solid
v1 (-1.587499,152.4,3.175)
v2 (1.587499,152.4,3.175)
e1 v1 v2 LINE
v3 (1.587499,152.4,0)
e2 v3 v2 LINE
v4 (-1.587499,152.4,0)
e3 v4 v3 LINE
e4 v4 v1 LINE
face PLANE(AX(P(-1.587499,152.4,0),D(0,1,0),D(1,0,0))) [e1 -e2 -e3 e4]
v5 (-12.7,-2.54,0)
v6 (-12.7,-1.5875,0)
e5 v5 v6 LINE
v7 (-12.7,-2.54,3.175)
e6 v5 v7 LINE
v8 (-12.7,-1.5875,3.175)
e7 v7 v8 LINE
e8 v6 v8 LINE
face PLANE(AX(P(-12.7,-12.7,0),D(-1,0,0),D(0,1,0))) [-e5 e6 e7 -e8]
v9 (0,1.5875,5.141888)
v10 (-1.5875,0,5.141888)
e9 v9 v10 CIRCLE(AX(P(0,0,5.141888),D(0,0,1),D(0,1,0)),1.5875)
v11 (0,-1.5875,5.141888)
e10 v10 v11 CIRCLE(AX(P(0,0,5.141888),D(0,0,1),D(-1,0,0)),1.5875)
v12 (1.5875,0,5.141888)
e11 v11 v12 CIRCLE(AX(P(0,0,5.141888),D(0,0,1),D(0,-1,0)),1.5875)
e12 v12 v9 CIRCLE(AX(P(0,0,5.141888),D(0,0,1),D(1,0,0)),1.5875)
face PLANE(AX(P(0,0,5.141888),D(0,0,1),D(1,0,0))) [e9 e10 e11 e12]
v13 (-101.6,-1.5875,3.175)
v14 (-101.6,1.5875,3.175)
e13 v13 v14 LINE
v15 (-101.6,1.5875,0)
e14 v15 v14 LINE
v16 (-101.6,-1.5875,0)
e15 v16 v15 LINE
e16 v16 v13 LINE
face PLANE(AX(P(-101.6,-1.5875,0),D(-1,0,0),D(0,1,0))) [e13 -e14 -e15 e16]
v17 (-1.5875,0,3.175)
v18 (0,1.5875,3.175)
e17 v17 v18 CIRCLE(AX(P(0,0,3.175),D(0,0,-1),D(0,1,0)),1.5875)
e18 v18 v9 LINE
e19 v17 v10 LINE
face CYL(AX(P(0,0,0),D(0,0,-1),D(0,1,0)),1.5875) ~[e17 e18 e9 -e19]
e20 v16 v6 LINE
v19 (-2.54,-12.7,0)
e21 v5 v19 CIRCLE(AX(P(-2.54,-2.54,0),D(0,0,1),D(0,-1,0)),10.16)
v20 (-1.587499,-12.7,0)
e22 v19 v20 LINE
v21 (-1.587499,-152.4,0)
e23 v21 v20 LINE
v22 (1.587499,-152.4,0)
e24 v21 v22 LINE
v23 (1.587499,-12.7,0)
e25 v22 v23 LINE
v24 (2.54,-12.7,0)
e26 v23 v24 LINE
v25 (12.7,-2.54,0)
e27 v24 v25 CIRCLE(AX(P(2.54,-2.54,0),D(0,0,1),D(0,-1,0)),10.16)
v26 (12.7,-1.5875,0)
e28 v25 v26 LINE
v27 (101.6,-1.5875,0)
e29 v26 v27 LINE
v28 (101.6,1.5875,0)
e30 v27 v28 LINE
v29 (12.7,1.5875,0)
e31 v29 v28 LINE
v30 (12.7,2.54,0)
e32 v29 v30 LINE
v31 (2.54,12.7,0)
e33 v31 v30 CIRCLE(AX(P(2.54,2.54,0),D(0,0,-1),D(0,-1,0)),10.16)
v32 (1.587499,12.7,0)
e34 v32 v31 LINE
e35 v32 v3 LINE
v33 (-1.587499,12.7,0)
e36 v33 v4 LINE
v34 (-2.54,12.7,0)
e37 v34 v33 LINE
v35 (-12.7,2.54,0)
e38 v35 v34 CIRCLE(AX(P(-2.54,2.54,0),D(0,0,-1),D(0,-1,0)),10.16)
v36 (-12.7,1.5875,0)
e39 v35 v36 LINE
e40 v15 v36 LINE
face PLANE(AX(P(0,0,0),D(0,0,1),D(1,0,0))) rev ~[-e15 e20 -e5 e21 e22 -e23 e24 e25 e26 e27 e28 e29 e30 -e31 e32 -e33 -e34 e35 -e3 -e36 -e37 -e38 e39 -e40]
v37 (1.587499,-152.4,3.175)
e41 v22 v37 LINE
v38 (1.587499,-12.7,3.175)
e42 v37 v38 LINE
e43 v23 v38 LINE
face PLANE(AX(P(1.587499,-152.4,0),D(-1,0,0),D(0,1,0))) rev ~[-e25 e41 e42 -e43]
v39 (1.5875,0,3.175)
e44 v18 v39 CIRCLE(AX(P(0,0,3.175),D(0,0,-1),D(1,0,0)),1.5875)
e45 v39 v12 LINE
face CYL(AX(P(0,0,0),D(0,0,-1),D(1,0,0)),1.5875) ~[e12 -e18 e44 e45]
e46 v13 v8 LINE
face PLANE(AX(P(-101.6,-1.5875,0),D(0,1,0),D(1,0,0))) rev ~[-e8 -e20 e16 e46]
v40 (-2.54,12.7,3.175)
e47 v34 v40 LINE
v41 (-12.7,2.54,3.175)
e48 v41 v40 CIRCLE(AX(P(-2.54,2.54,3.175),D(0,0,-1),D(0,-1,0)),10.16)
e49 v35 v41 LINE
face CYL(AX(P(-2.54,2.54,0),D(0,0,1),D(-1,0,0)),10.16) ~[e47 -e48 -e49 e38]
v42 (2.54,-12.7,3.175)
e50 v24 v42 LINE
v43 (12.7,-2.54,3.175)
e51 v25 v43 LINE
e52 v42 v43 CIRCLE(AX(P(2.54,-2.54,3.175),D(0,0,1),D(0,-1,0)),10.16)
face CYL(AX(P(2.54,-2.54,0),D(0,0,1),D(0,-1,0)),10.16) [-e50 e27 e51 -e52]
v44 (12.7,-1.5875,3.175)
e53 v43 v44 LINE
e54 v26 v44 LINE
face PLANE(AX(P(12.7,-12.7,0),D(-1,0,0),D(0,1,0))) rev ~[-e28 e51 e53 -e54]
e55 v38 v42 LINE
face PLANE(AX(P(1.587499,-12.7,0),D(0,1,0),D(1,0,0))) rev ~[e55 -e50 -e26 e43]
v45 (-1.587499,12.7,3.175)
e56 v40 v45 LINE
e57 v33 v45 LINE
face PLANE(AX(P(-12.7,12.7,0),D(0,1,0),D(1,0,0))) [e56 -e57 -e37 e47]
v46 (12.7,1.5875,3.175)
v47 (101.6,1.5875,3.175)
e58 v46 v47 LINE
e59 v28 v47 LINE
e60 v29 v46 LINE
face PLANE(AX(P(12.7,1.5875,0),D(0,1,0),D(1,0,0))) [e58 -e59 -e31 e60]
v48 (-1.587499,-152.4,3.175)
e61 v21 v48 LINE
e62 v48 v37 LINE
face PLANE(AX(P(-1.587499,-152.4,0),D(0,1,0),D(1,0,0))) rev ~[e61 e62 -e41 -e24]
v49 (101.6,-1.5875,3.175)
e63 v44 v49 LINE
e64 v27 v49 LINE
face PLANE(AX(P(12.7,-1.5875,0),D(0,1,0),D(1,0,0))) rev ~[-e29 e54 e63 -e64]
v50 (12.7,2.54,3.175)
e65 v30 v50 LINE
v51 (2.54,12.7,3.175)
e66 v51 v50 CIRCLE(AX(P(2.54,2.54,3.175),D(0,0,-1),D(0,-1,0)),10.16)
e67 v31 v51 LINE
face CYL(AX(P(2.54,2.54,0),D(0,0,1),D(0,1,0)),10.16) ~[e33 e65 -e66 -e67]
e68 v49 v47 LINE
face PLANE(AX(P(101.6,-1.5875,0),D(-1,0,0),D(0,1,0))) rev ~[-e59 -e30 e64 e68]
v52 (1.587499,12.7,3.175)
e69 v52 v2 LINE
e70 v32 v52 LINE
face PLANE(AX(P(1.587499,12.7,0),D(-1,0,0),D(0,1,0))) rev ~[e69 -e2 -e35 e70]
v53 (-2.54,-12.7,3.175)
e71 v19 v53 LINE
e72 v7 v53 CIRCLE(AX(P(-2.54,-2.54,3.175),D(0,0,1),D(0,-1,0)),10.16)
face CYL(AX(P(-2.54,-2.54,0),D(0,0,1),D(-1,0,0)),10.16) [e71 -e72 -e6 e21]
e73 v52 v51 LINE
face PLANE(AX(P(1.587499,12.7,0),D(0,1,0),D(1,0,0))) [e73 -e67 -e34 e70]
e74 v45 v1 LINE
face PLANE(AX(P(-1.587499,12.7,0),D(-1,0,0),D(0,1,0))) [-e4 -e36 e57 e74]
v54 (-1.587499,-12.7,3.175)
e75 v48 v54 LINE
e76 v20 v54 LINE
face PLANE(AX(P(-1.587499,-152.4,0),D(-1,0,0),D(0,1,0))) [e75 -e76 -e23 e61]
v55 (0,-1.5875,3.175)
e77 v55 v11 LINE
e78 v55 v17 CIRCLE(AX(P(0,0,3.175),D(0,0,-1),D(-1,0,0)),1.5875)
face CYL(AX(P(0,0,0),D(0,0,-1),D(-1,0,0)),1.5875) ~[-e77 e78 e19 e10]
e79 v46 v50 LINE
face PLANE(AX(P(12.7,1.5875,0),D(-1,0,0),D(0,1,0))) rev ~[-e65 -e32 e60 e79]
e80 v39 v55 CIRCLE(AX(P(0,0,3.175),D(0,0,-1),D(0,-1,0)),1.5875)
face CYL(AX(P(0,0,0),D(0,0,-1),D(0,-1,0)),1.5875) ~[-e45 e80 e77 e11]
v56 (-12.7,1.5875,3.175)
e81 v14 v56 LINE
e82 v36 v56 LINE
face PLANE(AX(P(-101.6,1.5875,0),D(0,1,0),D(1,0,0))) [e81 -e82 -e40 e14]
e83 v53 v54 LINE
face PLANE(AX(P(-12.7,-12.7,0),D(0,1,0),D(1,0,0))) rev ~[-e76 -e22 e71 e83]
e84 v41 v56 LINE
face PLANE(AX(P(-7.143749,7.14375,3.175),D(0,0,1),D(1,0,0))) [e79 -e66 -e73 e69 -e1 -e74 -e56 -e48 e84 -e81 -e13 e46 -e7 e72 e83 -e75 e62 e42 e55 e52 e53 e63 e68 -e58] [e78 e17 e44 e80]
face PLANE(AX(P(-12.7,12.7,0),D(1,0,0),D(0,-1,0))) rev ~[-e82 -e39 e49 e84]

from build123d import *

# Parameters (mm, degrees)
F0_W     = 11.1125013079
F0_H     = 11.1125
F0_W_2   = 3.1749973842
F0_H_2   = 139.7
F0_W_3   = 88.9
F0_H_3   = 3.175
F1_DEPTH = 3.175
F2_DEPTH = 5.1418882795
F3_R     = 10.16


# Not quite as in the source:
# - ends of sketch curves that miss each other by under 0.0002 mm in the source are joined


with BuildPart() as f1:
    # F0 (on Top) → F1 (new body)
    with BuildSketch(Plane.XY):
        with Locations((-7.143749346, 7.14375)):
            Rectangle(F0_W, F0_H)
        with Locations((7.143749346, 7.14375)):
            Rectangle(F0_W, F0_H)
        with Locations((7.143749346, -7.14375)):
            Rectangle(F0_W, F0_H)
        with Locations((-7.143749346, -7.14375)):
            Rectangle(F0_W, F0_H)
        with Locations((0, 82.55)):
            Rectangle(F0_W_2, F0_H_2)
        Polygon((0, 1.5875), (1.5874986921, 1.5875), (1.5874986921, 12.7), (-1.5874986921, 12.7), (-1.5874986921, 1.5875), align=None)
        Polygon((1.5874986921, -1.5875), (12.7, -1.5875), (12.7, 1.5875), (1.5874986921, 1.5875), (1.5874986921, 0), align=None)
        Polygon((-12.7, -1.5875), (-1.5874986921, -1.5875), (-1.5874986921, 0), (-1.5874986921, 1.5875), (-12.7, 1.5875), align=None)
        Polygon((1.5874986921, -12.7), (1.5874986921, -1.5875), (0, -1.5875), (-1.5874986921, -1.5875), (-1.5874986921, -12.7), align=None)
        with Locations((0, -82.55)):
            Rectangle(F0_W_2, F0_H_2)
        with Locations((-57.15, 0)):
            Rectangle(F0_W_3, F0_H_3)
        with Locations((57.15, 0)):
            Rectangle(F0_W_3, F0_H_3)
        with BuildLine():
            Line((-1.5874986921, 1.5875), (-1.5874986921, 0))
            ThreePointArc((-1.5874986921, 0), (-1.1225320151, 1.1225320151), (0, 1.5875))
            Line((0, 1.5875), (-1.5874986921, 1.5875))
        make_face()
        with BuildLine():
            ThreePointArc((-1.5875, 0), (-1.1225320151, -1.1225320151), (0, -1.5875))
            ThreePointArc((0, -1.5875), (1.1225320151, -1.1225320151), (1.5875, 0))
            ThreePointArc((1.5875, 0), (1.1225320151, 1.1225320151), (0, 1.5875))
            ThreePointArc((0, 1.5875), (-1.1225320151, 1.1225320151), (-1.5875, 0))
        make_face()
        with BuildLine():
            ThreePointArc((0, 1.5875), (1.1225320151, 1.1225320151), (1.5875, 0))
            Line((1.5875, 0), (1.5874986921, 1.5875))
            Line((1.5874986921, 1.5875), (0, 1.5875))
        make_face()
        with BuildLine():
            Line((-1.5874986921, -1.5875), (0, -1.5875))
            ThreePointArc((0, -1.5875), (-1.1225320151, -1.1225320151), (-1.5875, 0))
            Line((-1.5875, 0), (-1.5874986921, -1.5875))
        make_face()
        with BuildLine():
            Line((0, -1.5875), (1.5874986921, -1.5875))
            Line((1.5874986921, -1.5875), (1.5874986921, 0))
            ThreePointArc((1.5874986921, 0), (1.1225320151, -1.1225320151), (0, -1.5875))
        make_face()
    extrude(amount=F1_DEPTH)

    # F0 (on Top) → F2 (join)
    with BuildSketch(Plane.XY):
        with BuildLine():
            ThreePointArc((-1.5875, 0), (-1.1225320151, -1.1225320151), (0, -1.5875))
            ThreePointArc((0, -1.5875), (1.1225320151, -1.1225320151), (1.5875, 0))
            ThreePointArc((1.5875, 0), (1.1225320151, 1.1225320151), (0, 1.5875))
            ThreePointArc((0, 1.5875), (-1.1225320151, 1.1225320151), (-1.5875, 0))
        make_face()
    extrude(amount=F2_DEPTH)

    # F3
    f3_edges = [f1.edges().sort_by_distance(p)[0] for p in [
        (12.7, -12.7, 1.5875),
        (-12.7, -12.7, 1.5875),
        (12.7, 12.7, 1.5875),
        (-12.7, 12.7, 1.5875),
    ]]
    fillet(f3_edges, radius=F3_R)


solid = f1.part
